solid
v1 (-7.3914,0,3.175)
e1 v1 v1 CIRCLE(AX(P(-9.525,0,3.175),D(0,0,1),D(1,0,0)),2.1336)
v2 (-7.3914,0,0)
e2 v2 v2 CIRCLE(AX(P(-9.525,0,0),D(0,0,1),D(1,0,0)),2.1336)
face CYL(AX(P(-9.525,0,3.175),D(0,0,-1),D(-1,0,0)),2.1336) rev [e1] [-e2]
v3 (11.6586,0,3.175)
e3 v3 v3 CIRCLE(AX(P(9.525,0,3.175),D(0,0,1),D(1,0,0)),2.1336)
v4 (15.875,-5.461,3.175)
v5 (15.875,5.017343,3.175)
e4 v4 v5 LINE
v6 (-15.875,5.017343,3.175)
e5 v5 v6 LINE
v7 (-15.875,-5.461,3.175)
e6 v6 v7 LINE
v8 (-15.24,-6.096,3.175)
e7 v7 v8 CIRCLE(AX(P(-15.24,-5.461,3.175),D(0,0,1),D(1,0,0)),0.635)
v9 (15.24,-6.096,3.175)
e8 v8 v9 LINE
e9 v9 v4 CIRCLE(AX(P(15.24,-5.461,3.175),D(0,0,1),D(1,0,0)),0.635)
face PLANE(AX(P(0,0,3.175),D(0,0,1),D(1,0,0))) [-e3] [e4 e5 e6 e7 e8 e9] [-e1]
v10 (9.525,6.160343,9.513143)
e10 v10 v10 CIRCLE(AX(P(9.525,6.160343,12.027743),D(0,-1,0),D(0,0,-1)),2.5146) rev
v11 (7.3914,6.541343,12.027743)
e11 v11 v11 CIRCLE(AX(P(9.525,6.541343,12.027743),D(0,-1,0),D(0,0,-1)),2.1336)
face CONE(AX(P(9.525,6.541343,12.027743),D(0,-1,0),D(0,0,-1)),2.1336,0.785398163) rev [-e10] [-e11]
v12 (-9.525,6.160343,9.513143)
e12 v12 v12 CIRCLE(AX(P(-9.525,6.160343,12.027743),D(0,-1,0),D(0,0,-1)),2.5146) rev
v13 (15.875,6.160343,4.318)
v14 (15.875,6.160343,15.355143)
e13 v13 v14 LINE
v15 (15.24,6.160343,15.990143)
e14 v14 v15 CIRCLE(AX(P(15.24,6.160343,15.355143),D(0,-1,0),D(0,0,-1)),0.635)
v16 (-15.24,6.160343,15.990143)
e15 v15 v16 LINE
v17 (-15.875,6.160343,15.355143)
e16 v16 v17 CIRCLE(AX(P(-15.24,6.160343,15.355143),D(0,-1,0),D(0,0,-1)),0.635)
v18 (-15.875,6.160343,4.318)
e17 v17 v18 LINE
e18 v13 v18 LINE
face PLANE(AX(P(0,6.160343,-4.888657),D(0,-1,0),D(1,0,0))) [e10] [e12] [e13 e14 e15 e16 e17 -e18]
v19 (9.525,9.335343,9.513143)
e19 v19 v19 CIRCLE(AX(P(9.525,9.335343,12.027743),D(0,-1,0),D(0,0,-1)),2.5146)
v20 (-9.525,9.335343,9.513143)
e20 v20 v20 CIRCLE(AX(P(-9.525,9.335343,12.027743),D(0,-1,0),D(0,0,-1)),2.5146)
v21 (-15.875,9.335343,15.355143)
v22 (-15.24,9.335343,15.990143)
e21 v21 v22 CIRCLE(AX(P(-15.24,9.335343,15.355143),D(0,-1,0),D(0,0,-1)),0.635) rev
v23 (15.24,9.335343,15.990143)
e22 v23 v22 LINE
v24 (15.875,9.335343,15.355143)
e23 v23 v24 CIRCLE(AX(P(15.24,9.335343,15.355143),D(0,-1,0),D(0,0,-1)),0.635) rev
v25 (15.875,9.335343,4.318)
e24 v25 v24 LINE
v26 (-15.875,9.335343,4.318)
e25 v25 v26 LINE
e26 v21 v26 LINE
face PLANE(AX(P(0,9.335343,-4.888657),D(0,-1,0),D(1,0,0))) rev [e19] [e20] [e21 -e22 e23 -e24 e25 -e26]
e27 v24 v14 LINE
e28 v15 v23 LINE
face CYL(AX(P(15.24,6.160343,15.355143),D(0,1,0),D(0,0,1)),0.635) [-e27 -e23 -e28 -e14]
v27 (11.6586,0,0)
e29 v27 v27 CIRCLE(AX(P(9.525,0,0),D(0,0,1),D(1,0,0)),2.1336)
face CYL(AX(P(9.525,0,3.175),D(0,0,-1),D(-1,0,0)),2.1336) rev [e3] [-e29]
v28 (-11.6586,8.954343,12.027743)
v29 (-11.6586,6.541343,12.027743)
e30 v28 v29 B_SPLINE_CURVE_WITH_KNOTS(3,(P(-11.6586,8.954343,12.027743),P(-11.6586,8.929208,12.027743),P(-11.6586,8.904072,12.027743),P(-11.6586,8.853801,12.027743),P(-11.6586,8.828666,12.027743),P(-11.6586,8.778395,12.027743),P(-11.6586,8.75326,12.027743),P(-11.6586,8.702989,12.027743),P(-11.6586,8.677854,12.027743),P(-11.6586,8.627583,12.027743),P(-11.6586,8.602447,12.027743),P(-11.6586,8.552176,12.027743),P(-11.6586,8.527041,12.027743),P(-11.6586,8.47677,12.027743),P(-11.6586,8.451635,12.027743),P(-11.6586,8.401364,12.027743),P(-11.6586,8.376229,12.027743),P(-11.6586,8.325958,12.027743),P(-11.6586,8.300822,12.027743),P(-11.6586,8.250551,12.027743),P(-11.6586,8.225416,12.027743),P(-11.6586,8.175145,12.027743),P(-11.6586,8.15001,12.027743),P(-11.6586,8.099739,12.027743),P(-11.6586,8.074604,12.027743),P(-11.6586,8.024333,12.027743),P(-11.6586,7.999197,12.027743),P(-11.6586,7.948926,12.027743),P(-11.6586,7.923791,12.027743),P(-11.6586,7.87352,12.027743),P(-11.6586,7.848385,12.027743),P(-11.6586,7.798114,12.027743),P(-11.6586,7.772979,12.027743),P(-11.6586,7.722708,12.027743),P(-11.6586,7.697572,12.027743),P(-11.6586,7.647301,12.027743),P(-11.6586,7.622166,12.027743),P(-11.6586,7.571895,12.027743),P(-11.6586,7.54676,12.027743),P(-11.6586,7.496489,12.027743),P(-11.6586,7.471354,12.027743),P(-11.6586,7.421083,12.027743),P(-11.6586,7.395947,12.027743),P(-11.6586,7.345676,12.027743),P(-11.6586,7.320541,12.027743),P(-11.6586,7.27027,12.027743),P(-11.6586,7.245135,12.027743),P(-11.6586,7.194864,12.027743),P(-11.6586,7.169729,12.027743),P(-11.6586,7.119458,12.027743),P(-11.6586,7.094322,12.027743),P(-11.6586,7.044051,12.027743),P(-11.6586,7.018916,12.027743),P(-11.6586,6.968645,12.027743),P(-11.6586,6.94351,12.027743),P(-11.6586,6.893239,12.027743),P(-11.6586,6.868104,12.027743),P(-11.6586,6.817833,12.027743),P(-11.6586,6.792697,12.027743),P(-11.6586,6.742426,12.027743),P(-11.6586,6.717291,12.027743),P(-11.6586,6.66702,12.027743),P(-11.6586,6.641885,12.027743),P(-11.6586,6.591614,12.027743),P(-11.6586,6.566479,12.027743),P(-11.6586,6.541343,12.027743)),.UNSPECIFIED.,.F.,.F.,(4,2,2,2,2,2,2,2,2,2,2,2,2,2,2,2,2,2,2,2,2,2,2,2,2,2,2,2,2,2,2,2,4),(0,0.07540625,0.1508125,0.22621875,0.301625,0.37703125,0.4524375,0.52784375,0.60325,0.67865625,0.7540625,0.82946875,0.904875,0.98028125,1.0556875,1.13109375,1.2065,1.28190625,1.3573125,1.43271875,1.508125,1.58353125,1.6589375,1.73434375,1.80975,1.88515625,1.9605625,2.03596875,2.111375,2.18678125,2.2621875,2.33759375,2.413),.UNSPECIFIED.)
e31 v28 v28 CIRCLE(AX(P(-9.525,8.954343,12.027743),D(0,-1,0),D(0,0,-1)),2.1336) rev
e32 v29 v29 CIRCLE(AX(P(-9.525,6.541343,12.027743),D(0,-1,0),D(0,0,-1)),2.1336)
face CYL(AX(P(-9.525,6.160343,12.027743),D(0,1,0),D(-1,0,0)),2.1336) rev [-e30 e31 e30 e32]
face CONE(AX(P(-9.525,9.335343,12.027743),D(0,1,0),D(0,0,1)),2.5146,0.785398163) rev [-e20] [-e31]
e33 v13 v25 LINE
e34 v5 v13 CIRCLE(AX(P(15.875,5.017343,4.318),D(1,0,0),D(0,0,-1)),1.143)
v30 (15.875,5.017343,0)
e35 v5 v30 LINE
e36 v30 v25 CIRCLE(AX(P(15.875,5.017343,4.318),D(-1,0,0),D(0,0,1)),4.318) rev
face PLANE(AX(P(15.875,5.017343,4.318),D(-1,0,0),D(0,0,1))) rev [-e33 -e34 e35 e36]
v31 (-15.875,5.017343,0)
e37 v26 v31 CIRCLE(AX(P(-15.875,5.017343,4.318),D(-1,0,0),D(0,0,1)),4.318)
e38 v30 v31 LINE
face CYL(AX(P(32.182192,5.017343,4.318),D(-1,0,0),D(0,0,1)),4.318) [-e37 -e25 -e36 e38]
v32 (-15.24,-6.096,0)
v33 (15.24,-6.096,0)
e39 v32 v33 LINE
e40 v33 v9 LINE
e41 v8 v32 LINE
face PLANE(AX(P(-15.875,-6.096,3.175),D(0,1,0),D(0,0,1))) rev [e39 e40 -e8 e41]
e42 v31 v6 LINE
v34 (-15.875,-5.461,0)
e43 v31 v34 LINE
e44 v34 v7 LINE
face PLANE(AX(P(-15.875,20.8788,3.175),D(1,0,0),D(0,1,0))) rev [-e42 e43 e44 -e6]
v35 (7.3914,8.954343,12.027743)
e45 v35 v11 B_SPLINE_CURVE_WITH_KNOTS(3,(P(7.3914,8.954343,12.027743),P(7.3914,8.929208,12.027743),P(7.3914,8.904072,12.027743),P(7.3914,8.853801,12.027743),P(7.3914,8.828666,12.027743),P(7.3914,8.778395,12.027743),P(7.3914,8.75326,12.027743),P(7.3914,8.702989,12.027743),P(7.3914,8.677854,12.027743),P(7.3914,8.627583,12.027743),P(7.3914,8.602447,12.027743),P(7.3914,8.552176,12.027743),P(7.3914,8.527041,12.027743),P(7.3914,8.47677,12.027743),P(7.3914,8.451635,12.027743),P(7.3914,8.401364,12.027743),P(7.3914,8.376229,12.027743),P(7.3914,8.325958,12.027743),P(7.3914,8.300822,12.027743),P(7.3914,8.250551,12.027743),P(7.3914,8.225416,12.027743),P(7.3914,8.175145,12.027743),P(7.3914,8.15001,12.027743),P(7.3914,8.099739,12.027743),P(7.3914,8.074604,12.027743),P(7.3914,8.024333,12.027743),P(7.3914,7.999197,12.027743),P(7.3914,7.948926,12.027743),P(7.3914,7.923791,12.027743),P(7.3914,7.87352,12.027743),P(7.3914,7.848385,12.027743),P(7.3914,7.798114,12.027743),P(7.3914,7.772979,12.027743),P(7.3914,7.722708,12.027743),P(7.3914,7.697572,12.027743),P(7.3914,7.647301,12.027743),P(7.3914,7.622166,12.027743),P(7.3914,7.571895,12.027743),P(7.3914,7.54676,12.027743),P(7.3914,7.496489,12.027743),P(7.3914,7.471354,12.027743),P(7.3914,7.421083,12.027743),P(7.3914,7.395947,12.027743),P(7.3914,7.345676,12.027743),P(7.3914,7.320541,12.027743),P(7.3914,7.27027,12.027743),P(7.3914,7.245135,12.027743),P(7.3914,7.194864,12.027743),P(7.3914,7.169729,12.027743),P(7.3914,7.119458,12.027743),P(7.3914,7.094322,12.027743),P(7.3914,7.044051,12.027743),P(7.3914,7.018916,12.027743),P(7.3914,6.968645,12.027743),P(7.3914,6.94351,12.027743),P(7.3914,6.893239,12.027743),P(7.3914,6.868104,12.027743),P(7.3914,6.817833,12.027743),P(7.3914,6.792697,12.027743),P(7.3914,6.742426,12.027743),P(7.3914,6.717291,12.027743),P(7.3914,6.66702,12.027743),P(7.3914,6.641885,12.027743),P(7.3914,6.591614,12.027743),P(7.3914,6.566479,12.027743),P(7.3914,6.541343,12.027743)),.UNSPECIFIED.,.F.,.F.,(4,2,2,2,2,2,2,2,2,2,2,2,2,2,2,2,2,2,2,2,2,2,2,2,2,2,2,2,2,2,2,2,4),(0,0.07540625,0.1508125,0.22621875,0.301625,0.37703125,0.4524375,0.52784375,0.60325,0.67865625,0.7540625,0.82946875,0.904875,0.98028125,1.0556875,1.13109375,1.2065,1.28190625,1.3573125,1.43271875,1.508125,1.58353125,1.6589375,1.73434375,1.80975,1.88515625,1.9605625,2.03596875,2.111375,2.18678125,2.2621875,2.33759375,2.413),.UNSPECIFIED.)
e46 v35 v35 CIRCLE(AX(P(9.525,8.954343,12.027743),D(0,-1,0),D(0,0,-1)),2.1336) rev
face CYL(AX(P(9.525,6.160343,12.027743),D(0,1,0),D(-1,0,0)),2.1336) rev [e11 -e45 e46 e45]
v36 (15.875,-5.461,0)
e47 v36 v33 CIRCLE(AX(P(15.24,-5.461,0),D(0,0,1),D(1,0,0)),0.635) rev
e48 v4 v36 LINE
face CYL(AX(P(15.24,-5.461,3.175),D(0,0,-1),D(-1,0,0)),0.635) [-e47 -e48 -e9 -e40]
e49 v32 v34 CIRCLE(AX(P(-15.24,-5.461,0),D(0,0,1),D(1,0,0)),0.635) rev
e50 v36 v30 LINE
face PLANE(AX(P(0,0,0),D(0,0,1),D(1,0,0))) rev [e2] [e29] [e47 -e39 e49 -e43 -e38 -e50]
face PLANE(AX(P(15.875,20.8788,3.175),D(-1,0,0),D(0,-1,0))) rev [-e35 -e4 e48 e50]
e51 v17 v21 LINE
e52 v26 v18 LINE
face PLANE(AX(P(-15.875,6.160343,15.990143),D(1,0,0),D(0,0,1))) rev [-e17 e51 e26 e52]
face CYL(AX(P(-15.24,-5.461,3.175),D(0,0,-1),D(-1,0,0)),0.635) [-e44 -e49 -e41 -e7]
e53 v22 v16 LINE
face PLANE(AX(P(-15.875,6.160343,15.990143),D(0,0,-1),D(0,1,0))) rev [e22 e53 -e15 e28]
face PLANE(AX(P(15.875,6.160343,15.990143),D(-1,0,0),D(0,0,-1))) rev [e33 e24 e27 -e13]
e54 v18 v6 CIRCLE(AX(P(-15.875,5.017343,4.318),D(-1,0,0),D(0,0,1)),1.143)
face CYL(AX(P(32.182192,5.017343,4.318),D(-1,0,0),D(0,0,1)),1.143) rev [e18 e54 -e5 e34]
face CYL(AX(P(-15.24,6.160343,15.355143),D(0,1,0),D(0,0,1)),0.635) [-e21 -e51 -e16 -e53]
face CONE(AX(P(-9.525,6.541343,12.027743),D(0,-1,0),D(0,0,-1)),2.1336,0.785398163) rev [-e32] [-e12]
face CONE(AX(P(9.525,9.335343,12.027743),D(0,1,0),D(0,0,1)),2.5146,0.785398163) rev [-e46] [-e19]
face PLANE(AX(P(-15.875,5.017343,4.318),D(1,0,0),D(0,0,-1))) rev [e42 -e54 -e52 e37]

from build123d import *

# Parameters (mm, degrees)
SKETCH1_W                  = 31.75
SKETCH1_H                  = 26.9748
SKETCH1_R                  = 2.1336
BASE_FLANGE1_DEPTH         = 3.175
SKETCHED_START             = 9.335343098
SKETCHED_BEND1_OUTLINE_W   = 31.75
SKETCHED_BEND1_OUTLINE_H   = 3.175
SKETCHED_BEND1_DEPTH       = 11.543456902
SKETCHED_START_2           = 6.160343098
SKETCHED_BEND1_2_OUTLINE_W = 31.75
SKETCHED_BEND1_2_OUTLINE_H = 12.815143098
SKETCHED_BEND1_2_OUTLINE_R = 2.1336
SKETCHED_BEND1_2_DEPTH     = 2.71893284
SKETCHED_START_3           = 5.017343098
SKETCHED_BEND1_3_OUTLINE_W = 31.75
SKETCHED_BEND1_3_OUTLINE_H = 12.815143098
SKETCHED_BEND1_3_OUTLINE_R = 2.1336
SKETCHED_BEND1_3_DEPTH     = 4.318
SKETCHED_START_4           = -15.875
SKETCHED_BEND1_4_DEPTH     = 31.75
CHAMFER1_SIZE              = 0.381
FILLET1_R                  = 0.635


with BuildPart() as part:
    # Base-Flange1: sheet metal written as solids
    # Sketch1 → Base-Flange1 (new body)
    with BuildSketch(Plane.XY):
        with Locations((0, 7.3914)):
            Rectangle(SKETCH1_W, SKETCH1_H)
        with Locations((9.525, 0)):
            Circle(SKETCH1_R, mode=Mode.SUBTRACT)
        with Locations((-9.525, 0)):
            Circle(SKETCH1_R, mode=Mode.SUBTRACT)
        with Locations((9.525, 16.9164)):
            Circle(SKETCH1_R, mode=Mode.SUBTRACT)
        with Locations((-9.525, 16.9164)):
            Circle(SKETCH1_R, mode=Mode.SUBTRACT)
    extrude(amount=BASE_FLANGE1_DEPTH)

    # Sketched Bend1: read off the stored shape, not the designer's step
    # Sketched Bend1 outline → Sketched Bend1 (cut)
    with BuildSketch(Plane(origin=(0, 0, 0), x_dir=(1, 0, 0), z_dir=(0, 1, 0)).offset(SKETCHED_START)):
        with Locations((0, -1.5875)):
            Rectangle(SKETCHED_BEND1_OUTLINE_W, SKETCHED_BEND1_OUTLINE_H)
    extrude(amount=SKETCHED_BEND1_DEPTH, mode=Mode.SUBTRACT)

    # Sketched Bend1 2 outline → Sketched Bend1 2 (add)
    with BuildSketch(Plane(origin=(0, 0, 0), x_dir=(1, 0, 0), z_dir=(0, 1, 0)).offset(SKETCHED_START_2)):
        with Locations((0, -9.582571549)):
            Rectangle(SKETCHED_BEND1_2_OUTLINE_W, SKETCHED_BEND1_2_OUTLINE_H)
        with Locations((-9.525, -12.027743098)):
            Circle(SKETCHED_BEND1_2_OUTLINE_R, mode=Mode.SUBTRACT)
        with Locations((9.525, -12.027743098)):
            Circle(SKETCHED_BEND1_2_OUTLINE_R, mode=Mode.SUBTRACT)
    extrude(amount=SKETCHED_BEND1_2_DEPTH)

    # Sketched Bend1 3 outline → Sketched Bend1 3 (add)
    with BuildSketch(Plane(origin=(0, 0, 0), x_dir=(1, 0, 0), z_dir=(0, 1, 0)).offset(SKETCHED_START_3)):
        with Locations((0, -9.582571549)):
            Rectangle(SKETCHED_BEND1_3_OUTLINE_W, SKETCHED_BEND1_3_OUTLINE_H)
        with Locations((-9.525, -12.027743098)):
            Circle(SKETCHED_BEND1_3_OUTLINE_R, mode=Mode.SUBTRACT)
        with Locations((9.525, -12.027743098)):
            Circle(SKETCHED_BEND1_3_OUTLINE_R, mode=Mode.SUBTRACT)
    extrude(amount=SKETCHED_BEND1_3_DEPTH)

    # Sketched Bend1 4 outline → Sketched Bend1 4 (cut)
    with BuildSketch(Plane.YZ.offset(SKETCHED_START_4)):
        with BuildLine():
            Line((6.160343098, 4.318), (6.160343098, 15.990143098))
            Line((6.160343098, 15.990143098), (5.017343098, 15.990143098))
            Line((5.017343098, 15.990143098), (5.017343098, 3.175))
            ThreePointArc((5.017343098, 3.175), (5.825566149, 3.509776949), (6.160343098, 4.318))
        make_face()
        with BuildLine():
            Line((9.335343098, 0), (9.335343098, 4.318))
            ThreePointArc((9.335343098, 4.318), (8.070630179, 1.264712919), (5.017343098, 0))
            Line((5.017343098, 0), (9.335343098, 0))
        make_face()
    extrude(amount=SKETCHED_BEND1_4_DEPTH, mode=Mode.SUBTRACT)

    # Chamfer1
    chamfer1_edges = [part.edges().sort_by_distance(p)[0] for p in [
        (7.3914, 9.335343098, 12.027743098),
        (7.3914, 6.160343098, 12.027743098),
        (-11.6586, 9.335343098, 12.027743098),
        (-11.6586, 6.160343098, 12.027743098),
    ]]
    chamfer(chamfer1_edges, length=CHAMFER1_SIZE)

    # Fillet1
    fillet1_edges = [part.edges().sort_by_distance(p)[0] for p in [
        (-15.875, -6.096, 1.5875),
        (15.875, -6.096, 1.5875),
        (-15.875, 7.747843098, 15.990143098),
        (15.875, 7.747843098, 15.990143098),
    ]]
    fillet(fillet1_edges, radius=FILLET1_R)


solid = part.part
